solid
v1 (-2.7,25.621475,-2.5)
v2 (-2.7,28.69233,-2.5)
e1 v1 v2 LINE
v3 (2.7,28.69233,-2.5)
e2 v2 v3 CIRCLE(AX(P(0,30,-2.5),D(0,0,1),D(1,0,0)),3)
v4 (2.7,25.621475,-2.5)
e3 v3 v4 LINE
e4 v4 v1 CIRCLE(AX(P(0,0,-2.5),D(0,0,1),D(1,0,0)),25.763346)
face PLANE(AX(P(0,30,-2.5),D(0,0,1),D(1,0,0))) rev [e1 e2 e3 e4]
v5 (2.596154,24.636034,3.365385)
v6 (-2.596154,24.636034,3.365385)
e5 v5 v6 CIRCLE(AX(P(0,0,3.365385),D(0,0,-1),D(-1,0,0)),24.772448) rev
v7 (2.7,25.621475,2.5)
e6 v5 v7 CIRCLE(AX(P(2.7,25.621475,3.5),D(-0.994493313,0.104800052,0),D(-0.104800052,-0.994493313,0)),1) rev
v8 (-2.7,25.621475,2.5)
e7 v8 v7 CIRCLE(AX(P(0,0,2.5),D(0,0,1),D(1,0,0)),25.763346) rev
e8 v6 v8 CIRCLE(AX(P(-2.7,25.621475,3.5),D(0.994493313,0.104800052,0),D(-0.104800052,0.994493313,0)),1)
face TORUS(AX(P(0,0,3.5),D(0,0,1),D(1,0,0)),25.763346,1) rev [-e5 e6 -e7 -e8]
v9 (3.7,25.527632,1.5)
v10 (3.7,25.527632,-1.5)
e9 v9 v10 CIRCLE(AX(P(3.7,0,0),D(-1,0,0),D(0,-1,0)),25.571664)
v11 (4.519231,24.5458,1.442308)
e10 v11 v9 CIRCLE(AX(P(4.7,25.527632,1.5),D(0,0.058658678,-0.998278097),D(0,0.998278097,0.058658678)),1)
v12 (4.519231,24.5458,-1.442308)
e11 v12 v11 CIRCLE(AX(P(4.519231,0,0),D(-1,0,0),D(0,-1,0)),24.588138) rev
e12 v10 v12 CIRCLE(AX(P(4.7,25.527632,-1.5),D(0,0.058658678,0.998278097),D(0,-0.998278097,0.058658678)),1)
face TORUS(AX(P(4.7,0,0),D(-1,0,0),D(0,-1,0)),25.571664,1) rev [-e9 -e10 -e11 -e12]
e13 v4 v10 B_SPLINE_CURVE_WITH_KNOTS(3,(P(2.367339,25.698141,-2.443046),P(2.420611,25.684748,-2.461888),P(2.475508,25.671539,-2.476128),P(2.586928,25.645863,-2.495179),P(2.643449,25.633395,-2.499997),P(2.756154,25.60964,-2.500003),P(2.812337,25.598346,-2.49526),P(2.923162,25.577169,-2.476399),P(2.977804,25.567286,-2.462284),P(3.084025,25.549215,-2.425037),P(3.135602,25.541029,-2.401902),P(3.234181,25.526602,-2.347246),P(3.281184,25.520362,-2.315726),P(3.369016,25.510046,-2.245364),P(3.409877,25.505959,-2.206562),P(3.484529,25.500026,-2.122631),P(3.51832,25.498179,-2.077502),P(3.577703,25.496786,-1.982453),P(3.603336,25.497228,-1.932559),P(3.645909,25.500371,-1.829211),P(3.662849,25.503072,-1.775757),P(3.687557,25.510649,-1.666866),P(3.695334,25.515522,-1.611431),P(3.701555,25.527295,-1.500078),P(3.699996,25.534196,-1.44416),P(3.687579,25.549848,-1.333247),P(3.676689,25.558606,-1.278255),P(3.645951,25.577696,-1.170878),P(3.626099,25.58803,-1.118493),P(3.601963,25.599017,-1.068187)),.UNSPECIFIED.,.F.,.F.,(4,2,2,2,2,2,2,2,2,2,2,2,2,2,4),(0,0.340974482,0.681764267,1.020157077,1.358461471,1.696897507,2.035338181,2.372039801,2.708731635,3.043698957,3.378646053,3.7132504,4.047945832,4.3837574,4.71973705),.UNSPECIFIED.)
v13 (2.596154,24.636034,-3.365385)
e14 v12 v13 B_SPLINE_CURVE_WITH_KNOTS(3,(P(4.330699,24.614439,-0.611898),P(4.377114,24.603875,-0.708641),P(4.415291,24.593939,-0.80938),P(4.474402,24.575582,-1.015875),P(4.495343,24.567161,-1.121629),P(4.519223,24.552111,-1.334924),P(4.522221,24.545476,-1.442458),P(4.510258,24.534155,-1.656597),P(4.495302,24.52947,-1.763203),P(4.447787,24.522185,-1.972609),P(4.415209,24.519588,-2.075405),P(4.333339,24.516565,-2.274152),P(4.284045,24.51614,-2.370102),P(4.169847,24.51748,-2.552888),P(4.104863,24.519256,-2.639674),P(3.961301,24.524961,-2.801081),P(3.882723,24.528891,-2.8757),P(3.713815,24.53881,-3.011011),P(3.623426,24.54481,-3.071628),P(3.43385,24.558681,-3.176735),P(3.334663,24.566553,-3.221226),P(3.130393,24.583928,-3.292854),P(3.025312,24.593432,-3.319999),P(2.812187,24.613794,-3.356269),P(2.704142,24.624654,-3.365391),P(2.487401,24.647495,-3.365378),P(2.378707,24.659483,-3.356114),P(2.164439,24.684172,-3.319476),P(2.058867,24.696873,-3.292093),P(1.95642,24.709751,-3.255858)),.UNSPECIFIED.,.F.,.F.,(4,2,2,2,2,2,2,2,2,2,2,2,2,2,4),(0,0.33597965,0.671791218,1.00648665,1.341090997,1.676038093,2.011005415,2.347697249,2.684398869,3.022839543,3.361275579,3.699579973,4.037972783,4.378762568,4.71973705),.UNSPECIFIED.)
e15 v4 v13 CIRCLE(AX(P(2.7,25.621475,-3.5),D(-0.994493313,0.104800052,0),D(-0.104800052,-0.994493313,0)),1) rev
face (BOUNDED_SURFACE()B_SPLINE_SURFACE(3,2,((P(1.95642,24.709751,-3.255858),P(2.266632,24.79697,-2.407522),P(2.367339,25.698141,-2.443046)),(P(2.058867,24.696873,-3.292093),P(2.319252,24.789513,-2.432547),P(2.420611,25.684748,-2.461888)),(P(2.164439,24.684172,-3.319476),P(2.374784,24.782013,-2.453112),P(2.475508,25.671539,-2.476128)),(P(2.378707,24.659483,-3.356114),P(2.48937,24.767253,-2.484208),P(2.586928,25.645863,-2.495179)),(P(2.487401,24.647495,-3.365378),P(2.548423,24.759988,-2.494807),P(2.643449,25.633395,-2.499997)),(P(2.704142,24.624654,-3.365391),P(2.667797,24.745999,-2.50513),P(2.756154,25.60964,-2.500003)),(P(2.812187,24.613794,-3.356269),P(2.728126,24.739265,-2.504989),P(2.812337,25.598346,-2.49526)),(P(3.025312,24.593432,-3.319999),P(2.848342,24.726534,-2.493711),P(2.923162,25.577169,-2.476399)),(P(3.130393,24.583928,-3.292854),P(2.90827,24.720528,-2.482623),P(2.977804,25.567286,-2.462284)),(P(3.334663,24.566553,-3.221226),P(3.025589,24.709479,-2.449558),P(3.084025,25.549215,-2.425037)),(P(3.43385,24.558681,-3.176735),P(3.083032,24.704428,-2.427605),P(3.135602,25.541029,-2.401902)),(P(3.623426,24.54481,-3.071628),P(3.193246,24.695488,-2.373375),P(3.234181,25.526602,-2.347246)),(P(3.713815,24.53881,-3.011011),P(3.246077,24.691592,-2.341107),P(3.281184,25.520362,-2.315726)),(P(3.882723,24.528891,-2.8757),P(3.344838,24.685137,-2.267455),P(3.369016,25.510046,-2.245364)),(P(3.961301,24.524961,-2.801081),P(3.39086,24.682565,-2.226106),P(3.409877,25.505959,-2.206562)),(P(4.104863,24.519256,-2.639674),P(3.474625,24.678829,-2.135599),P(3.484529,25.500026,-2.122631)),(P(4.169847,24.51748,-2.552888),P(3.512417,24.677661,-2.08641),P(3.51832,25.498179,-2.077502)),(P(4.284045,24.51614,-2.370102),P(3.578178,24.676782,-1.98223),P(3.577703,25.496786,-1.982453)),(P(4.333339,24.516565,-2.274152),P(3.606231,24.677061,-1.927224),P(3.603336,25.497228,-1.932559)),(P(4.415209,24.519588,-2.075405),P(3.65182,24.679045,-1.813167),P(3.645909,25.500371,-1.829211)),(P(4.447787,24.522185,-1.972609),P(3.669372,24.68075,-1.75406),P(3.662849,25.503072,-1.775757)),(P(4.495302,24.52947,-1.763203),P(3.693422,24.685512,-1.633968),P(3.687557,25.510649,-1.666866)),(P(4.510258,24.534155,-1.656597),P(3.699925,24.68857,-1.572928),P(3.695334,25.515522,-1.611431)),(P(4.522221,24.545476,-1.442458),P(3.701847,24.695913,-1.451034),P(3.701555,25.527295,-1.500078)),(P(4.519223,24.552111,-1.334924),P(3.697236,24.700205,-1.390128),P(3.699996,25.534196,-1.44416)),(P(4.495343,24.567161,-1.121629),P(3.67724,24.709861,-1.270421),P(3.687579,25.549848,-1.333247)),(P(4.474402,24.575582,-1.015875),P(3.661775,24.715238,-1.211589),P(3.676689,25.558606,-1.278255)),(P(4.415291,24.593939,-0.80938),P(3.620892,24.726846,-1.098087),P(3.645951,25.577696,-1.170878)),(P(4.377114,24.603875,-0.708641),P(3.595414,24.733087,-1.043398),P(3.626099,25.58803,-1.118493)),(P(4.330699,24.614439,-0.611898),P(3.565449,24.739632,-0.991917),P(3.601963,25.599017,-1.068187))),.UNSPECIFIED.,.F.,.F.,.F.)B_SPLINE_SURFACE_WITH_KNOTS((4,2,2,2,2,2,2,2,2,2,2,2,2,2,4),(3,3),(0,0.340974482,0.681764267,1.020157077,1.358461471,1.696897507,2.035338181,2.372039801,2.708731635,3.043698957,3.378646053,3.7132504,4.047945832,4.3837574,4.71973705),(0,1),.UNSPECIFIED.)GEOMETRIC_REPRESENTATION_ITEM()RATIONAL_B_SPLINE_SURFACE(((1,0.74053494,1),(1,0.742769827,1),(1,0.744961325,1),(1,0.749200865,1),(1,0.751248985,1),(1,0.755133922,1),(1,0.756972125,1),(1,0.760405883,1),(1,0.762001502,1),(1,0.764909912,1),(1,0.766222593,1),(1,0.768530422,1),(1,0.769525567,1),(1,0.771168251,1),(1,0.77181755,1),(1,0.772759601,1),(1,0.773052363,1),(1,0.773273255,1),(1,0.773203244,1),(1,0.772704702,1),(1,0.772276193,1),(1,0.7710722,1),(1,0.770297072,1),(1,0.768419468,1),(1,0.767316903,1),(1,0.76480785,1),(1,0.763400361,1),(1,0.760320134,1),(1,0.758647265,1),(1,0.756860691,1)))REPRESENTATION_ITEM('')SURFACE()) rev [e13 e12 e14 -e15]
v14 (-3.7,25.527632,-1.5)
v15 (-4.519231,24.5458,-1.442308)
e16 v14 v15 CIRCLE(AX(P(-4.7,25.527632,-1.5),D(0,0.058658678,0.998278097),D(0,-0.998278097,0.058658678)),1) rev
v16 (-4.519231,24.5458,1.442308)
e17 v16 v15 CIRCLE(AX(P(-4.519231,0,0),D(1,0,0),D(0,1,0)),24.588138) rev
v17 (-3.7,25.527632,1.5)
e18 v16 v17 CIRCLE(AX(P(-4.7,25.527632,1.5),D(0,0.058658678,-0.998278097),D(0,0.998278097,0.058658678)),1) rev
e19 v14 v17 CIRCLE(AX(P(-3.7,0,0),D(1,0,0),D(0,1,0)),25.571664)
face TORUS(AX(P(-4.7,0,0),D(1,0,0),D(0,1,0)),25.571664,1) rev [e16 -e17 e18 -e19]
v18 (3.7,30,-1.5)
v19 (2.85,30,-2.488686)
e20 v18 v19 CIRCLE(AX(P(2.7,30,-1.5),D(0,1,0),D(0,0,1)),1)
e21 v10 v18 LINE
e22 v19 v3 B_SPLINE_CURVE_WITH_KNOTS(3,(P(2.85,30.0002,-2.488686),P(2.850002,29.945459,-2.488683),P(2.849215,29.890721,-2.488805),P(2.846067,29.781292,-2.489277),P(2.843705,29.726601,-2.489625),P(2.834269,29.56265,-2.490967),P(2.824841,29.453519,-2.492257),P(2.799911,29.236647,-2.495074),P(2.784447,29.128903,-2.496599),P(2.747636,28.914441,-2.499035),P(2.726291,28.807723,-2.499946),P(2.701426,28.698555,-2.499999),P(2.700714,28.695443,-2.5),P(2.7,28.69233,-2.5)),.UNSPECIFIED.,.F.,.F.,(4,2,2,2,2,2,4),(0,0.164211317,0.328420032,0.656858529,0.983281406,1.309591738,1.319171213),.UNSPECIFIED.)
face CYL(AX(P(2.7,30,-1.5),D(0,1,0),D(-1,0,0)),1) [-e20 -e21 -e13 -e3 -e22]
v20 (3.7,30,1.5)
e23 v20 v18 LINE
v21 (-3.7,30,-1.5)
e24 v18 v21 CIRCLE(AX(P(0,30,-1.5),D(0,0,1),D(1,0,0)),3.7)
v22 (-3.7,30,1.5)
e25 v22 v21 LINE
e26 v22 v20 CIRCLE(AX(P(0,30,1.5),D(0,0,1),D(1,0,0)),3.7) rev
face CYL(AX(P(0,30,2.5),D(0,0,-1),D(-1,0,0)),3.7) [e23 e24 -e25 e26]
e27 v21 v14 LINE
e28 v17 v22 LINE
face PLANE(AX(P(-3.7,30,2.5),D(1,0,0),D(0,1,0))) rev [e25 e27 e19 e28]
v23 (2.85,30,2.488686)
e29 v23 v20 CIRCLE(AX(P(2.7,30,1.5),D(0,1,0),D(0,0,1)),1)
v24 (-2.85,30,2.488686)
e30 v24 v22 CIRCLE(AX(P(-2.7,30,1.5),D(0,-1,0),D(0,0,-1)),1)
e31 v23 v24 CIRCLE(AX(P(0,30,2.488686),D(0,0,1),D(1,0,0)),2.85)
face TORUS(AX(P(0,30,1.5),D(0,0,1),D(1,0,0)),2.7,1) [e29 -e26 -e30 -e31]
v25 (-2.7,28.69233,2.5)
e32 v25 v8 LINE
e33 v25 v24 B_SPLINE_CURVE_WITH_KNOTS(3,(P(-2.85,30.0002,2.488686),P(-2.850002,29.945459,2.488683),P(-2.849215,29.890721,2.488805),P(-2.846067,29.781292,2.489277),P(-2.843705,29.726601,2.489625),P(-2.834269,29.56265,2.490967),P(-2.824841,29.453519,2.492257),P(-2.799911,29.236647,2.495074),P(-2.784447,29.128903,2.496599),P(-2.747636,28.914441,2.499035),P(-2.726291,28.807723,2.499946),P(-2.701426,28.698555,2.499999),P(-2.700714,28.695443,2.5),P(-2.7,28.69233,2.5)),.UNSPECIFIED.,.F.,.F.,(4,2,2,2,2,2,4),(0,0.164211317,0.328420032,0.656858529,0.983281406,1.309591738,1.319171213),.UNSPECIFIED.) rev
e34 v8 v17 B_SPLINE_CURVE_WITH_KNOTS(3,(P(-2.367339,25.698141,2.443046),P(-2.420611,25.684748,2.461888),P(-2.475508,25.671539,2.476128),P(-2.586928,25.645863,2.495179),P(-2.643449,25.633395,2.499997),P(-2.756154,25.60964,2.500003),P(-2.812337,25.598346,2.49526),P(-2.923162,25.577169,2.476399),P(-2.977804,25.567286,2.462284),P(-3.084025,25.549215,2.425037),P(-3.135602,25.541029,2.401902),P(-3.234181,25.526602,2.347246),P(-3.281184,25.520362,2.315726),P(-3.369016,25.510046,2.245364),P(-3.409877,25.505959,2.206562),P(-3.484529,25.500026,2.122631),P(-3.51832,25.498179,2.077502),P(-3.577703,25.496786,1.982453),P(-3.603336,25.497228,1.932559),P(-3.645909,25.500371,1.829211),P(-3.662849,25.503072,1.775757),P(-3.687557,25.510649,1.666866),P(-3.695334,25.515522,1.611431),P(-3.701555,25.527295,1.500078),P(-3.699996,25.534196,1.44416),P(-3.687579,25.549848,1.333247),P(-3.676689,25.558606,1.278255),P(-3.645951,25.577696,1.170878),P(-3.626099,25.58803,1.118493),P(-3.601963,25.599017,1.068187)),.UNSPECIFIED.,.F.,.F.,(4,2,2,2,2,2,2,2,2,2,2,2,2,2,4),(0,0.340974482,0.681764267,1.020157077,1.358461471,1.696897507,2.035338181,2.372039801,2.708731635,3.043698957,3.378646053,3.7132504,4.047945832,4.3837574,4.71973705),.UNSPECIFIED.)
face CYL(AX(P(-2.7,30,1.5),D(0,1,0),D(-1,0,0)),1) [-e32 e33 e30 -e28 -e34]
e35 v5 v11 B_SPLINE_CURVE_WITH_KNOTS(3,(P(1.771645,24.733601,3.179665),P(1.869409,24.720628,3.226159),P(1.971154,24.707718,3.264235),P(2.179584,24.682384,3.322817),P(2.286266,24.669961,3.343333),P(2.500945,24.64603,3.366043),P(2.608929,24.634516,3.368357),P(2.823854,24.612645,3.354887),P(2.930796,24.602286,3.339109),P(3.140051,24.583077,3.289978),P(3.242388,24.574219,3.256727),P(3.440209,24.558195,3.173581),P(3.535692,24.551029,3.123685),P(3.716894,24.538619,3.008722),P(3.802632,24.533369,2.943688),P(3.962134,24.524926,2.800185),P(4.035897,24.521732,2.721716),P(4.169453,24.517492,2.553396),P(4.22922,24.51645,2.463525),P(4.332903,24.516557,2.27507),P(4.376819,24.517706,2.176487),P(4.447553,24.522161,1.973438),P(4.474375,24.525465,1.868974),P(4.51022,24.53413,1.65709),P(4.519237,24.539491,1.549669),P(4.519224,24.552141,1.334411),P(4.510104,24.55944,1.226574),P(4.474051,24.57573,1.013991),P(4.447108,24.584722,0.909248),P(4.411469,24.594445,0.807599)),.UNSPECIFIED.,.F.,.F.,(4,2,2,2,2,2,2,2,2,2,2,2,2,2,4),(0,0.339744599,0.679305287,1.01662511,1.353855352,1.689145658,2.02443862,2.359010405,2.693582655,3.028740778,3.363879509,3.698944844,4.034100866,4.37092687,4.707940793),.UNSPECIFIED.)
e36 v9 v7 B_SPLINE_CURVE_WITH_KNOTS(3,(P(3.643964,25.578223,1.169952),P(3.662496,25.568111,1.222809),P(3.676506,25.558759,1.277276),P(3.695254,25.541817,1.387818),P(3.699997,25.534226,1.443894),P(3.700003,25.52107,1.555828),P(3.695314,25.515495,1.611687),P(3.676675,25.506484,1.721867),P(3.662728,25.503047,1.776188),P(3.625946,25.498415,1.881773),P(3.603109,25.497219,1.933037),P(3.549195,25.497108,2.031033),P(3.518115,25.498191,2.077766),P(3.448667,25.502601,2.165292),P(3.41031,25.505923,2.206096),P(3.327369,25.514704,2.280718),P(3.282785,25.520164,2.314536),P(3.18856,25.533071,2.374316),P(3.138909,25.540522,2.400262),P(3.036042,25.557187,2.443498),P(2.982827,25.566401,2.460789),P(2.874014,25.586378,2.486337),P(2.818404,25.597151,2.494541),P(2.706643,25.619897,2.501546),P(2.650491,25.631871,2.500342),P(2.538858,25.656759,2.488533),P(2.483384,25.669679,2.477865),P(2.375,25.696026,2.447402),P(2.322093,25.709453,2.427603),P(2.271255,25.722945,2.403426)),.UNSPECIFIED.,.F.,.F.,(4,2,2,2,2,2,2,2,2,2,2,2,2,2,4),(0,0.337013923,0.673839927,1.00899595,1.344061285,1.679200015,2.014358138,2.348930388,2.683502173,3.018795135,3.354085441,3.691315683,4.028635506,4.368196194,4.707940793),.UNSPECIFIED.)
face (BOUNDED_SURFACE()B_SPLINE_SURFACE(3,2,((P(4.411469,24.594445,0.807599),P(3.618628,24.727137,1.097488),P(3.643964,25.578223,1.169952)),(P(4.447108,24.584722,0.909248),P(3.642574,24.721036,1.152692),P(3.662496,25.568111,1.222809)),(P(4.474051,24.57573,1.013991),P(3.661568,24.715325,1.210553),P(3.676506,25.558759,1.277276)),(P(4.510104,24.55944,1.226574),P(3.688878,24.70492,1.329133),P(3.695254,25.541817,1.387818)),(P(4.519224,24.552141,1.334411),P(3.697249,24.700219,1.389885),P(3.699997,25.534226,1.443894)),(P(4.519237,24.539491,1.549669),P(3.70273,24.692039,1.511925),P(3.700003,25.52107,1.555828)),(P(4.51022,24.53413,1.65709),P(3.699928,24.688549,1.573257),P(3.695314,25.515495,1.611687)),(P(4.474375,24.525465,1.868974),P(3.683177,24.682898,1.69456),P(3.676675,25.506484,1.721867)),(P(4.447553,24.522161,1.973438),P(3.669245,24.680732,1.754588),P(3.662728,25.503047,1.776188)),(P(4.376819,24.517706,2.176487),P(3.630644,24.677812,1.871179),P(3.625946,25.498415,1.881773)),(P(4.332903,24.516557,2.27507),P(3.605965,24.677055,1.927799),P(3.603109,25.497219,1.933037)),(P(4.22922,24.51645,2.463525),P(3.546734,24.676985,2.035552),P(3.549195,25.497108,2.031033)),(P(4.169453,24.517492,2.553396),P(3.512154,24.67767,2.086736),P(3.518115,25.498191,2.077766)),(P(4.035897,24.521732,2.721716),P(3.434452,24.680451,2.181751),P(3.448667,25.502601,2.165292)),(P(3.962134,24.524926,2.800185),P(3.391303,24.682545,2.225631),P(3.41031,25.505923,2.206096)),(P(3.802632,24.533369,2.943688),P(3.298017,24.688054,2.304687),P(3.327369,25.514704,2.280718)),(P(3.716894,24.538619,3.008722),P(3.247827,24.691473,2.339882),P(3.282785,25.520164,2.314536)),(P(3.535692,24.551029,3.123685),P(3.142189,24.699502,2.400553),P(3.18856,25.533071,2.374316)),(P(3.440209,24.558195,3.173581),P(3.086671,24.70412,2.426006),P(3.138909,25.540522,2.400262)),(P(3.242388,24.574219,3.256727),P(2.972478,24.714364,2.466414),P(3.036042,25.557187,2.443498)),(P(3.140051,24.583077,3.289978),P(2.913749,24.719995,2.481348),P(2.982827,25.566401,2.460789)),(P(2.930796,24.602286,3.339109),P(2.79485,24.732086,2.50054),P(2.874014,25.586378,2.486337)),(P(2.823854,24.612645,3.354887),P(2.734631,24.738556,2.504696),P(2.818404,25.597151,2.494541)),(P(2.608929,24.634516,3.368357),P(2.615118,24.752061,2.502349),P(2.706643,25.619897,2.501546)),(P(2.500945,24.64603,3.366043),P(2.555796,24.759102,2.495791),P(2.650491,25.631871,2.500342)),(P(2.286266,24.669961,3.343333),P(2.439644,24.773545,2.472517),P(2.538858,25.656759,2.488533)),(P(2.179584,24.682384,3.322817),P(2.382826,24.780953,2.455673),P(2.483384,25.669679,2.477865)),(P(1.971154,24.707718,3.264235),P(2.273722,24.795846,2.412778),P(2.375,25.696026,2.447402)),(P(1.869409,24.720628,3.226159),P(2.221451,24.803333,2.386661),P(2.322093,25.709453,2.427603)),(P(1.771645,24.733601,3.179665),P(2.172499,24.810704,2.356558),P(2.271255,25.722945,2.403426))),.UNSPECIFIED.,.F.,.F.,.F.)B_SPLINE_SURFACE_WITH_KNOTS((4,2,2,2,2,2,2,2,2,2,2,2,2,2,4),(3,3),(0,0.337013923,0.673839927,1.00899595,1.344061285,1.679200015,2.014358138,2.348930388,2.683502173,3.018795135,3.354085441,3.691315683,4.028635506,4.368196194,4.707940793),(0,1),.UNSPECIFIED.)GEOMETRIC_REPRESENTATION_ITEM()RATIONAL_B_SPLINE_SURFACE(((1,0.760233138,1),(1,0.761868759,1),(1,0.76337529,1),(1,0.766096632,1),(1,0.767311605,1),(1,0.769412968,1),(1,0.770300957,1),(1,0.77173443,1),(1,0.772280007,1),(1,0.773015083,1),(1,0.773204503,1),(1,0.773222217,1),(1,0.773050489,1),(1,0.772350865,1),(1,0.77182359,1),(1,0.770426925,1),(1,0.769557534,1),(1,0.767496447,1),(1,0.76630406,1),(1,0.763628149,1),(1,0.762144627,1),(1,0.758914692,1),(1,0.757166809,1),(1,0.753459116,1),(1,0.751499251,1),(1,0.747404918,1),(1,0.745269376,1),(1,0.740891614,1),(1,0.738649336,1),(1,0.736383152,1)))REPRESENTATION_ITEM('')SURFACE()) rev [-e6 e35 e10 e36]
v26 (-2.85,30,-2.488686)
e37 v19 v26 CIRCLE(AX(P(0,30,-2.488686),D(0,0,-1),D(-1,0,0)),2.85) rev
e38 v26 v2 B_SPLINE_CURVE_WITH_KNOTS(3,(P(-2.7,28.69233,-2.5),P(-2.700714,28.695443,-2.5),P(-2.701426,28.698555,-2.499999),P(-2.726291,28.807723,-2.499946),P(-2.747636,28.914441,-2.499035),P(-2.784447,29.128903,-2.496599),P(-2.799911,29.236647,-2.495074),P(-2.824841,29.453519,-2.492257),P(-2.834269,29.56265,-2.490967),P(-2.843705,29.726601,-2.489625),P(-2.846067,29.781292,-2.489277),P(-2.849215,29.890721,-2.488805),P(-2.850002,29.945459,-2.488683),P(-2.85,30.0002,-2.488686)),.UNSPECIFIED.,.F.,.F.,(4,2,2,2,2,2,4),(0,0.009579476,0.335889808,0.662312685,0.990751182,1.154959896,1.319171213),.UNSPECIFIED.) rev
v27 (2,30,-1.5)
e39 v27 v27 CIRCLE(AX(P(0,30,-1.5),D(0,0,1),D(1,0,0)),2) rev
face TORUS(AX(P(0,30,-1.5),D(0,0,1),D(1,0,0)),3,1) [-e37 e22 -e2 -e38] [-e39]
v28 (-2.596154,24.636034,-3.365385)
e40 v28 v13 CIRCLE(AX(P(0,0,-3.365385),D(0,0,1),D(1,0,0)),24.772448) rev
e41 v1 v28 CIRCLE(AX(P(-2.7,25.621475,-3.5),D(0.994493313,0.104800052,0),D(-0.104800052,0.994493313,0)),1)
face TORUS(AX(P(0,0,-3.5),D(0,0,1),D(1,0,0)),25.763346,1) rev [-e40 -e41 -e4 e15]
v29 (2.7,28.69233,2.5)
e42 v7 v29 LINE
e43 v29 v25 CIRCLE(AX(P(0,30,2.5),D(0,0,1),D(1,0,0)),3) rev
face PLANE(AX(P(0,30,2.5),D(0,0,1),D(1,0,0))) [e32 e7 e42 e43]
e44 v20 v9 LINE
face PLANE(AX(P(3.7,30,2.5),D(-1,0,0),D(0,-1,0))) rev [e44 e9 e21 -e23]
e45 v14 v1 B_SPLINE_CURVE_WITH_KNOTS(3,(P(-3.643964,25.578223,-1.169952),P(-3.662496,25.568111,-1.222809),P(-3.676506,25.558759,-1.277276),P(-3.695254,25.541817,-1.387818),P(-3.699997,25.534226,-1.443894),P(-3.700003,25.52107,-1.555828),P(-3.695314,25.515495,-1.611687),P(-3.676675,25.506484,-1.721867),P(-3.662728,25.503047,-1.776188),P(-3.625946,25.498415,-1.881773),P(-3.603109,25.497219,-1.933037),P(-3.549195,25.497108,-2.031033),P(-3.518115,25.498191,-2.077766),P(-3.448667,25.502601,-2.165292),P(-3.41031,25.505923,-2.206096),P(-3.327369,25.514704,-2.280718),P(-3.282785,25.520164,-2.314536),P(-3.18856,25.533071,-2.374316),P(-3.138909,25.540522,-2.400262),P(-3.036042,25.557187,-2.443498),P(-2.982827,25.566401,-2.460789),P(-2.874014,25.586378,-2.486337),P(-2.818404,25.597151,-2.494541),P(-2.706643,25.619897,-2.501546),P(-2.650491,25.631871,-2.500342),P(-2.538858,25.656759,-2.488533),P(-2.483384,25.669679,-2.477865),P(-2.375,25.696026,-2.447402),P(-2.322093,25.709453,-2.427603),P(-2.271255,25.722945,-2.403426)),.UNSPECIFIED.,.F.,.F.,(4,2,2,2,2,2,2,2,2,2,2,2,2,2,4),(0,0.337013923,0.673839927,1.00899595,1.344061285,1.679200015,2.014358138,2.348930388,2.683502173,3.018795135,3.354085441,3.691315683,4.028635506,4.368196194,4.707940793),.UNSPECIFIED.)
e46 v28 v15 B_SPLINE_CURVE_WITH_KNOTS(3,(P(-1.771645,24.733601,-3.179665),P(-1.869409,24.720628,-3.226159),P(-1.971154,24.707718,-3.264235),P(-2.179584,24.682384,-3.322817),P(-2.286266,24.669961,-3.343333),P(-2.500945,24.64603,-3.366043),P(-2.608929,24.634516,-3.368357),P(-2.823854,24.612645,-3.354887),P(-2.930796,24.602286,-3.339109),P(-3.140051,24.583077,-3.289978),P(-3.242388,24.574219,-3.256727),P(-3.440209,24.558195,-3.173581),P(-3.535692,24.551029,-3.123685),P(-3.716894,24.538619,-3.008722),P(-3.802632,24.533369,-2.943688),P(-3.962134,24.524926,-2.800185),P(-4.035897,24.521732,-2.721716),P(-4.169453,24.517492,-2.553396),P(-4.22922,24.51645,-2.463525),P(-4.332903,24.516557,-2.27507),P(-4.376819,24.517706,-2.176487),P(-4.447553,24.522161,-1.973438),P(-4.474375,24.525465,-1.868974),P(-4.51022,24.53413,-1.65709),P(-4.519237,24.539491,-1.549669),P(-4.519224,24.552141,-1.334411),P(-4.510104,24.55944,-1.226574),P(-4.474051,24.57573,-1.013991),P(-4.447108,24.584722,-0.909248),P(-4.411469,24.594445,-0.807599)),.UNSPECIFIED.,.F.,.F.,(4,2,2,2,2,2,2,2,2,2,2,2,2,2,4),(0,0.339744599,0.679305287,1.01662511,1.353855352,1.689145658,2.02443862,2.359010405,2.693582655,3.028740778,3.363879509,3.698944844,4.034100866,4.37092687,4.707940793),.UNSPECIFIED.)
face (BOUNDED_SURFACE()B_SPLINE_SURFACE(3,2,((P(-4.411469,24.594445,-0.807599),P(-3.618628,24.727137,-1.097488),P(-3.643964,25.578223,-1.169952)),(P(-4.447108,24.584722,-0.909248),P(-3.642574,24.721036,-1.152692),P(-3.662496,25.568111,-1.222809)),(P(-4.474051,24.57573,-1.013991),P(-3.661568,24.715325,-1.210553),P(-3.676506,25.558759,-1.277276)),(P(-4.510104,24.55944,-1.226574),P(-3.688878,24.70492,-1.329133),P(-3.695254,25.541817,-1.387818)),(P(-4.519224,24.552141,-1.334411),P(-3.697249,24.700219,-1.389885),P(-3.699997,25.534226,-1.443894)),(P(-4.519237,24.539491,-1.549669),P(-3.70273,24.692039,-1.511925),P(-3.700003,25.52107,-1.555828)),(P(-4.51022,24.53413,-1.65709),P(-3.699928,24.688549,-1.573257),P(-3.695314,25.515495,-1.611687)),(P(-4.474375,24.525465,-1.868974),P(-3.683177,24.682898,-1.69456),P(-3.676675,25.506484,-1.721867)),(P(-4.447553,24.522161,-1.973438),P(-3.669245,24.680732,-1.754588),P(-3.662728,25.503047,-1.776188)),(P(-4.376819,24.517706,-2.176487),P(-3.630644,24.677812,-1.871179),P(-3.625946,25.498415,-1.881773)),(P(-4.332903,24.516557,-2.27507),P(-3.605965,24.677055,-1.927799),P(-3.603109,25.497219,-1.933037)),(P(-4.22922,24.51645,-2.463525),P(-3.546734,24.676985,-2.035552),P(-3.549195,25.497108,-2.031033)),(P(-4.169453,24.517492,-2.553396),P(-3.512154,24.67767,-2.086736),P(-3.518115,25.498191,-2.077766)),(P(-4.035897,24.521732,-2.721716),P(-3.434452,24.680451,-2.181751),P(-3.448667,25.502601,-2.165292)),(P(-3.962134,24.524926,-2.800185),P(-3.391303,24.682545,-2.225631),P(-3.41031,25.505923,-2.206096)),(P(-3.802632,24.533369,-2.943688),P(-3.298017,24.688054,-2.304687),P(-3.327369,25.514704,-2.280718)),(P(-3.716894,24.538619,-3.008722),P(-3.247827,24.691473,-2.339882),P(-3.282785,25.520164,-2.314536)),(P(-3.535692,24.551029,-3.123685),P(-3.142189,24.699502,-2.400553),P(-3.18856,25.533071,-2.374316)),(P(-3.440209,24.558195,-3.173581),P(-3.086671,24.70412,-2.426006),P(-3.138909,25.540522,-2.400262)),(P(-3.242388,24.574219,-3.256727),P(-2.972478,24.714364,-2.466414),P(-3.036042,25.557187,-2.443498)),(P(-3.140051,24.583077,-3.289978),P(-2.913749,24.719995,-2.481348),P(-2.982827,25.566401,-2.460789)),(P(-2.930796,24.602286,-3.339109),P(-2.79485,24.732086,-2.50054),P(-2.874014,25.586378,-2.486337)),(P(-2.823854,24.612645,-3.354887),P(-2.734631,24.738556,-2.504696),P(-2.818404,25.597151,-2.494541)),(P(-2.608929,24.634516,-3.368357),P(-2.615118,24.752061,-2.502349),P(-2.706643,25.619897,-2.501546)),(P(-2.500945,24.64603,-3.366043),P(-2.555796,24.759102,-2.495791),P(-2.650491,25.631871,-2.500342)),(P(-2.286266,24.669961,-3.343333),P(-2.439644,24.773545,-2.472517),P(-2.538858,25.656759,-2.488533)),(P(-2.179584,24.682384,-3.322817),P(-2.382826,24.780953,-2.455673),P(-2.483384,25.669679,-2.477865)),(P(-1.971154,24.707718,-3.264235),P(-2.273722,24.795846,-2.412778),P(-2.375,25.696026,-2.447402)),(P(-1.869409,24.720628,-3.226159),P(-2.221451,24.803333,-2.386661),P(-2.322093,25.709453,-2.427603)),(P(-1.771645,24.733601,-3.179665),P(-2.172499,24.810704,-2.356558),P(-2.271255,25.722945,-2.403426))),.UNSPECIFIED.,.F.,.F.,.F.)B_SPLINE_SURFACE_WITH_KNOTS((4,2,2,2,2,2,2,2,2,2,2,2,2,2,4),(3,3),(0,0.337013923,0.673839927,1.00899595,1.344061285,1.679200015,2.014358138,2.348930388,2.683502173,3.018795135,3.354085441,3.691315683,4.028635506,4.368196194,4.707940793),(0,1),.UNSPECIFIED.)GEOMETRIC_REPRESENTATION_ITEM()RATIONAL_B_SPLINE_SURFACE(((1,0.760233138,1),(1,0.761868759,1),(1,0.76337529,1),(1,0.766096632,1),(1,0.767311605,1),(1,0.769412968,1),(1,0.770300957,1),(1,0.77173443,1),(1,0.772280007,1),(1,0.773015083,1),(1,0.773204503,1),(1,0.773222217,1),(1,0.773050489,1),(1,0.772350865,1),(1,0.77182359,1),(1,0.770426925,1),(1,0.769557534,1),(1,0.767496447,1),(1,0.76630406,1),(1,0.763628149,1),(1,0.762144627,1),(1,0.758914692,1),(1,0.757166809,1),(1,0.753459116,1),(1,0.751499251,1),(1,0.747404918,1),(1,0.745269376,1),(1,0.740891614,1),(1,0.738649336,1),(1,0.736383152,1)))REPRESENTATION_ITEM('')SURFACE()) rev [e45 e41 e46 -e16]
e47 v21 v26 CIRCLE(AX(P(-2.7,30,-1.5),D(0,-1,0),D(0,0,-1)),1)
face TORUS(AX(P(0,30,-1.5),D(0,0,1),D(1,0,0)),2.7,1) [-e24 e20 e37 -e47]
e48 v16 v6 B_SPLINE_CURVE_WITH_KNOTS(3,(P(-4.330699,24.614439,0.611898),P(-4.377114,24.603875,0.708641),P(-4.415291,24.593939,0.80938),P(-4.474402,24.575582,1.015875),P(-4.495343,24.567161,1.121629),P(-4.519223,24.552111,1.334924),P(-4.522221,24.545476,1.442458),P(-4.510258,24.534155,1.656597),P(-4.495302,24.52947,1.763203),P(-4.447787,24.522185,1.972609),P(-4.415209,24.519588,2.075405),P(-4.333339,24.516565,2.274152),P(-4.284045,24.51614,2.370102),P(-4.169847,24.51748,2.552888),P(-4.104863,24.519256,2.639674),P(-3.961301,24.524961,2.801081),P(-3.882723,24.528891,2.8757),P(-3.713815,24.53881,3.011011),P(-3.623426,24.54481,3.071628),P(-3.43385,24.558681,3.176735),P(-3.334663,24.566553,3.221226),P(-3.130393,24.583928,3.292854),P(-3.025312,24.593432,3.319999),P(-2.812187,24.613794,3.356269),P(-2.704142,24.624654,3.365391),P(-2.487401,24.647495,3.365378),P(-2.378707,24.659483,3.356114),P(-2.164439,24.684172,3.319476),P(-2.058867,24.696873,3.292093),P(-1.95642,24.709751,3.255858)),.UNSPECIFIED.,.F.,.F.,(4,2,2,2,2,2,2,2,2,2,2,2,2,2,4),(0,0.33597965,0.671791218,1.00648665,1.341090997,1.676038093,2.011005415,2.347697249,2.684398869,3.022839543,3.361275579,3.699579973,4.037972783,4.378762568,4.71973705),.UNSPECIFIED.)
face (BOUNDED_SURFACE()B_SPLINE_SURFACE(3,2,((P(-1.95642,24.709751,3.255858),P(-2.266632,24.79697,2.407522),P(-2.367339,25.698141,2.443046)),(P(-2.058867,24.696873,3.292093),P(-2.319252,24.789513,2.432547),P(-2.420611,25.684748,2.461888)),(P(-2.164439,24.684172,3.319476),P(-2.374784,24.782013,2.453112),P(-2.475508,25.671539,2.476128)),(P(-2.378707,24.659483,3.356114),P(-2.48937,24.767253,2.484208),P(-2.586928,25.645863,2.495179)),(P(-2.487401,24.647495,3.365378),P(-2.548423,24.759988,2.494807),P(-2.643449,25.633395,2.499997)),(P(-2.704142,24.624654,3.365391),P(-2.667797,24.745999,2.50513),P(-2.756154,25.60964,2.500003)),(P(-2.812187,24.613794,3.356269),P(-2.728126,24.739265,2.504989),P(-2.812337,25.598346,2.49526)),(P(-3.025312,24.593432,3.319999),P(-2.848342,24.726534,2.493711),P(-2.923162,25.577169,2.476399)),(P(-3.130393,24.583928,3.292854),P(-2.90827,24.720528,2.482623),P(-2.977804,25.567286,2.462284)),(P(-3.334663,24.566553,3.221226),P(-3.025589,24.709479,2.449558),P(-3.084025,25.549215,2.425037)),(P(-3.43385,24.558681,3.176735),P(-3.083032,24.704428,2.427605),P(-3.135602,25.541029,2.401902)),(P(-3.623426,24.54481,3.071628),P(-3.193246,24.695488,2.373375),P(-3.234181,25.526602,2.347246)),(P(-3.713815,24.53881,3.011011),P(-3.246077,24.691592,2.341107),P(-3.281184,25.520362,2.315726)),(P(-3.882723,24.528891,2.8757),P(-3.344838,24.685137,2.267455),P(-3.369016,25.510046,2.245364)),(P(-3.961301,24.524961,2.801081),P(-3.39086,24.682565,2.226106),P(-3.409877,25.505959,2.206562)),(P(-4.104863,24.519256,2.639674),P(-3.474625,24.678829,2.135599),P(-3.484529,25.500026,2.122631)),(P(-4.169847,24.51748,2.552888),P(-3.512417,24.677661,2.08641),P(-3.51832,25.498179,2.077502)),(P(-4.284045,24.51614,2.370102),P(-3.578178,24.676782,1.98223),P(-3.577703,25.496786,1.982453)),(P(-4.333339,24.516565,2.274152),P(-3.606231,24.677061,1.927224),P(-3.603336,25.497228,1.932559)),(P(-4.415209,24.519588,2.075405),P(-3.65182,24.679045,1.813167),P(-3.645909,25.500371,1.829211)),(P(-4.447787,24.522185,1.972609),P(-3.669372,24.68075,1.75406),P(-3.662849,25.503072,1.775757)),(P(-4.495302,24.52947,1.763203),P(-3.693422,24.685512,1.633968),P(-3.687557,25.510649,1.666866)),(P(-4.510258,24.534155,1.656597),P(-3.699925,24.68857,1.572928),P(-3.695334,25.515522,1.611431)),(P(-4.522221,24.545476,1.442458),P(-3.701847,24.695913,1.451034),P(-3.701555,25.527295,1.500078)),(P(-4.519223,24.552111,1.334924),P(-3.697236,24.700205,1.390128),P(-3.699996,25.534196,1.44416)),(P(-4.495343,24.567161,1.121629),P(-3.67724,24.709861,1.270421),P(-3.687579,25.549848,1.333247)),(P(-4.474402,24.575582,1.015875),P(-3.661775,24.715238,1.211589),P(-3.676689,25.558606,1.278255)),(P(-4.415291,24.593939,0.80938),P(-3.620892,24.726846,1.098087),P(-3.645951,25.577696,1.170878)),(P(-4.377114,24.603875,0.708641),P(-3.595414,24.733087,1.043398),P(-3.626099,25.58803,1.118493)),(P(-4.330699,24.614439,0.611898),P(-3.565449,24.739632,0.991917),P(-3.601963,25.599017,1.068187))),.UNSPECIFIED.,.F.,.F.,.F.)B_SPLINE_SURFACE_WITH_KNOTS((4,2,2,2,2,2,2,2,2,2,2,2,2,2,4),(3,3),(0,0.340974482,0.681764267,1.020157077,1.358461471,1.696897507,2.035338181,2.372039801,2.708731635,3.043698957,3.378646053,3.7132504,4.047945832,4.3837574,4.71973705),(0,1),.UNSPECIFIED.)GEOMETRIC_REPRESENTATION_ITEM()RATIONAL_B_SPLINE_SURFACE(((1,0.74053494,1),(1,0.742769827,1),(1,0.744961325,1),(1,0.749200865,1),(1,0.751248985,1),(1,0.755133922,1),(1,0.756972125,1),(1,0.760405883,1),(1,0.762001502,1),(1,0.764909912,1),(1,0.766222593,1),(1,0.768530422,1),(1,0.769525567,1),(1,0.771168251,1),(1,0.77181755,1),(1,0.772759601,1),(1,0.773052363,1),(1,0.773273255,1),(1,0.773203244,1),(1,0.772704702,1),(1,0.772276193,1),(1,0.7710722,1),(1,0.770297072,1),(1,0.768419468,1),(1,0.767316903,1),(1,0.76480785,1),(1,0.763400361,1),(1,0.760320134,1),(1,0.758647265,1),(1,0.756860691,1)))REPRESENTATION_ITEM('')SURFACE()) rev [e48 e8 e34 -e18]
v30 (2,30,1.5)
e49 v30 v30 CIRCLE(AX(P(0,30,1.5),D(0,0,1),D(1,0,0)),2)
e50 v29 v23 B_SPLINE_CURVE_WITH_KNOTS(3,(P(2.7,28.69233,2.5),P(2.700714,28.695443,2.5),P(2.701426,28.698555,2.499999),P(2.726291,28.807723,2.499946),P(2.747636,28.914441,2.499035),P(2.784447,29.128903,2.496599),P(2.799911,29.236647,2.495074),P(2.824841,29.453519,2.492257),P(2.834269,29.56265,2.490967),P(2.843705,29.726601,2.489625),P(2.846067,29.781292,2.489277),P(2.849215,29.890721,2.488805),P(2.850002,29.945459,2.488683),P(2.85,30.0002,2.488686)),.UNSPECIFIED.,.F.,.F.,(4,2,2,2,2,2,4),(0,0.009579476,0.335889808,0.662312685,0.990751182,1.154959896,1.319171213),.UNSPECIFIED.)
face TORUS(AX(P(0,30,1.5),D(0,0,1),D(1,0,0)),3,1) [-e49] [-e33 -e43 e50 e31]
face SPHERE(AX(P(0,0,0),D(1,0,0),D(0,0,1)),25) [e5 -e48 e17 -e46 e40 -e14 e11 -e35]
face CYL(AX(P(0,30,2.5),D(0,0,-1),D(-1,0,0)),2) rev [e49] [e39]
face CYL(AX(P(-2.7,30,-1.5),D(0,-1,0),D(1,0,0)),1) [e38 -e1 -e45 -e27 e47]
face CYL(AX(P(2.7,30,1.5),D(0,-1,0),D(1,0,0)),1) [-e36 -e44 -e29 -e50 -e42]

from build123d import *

# Parameters (mm, degrees)
SKETCH2_R           = 2
BOSS_EXTRUDE1_DEPTH = 2.5
FILLET1_R           = 1


with BuildPart() as part:
    # Sketch1 → Revolve1 (revolve)
    with BuildSketch(Plane(origin=(0, 0, 0), x_dir=(1, 0, 0), z_dir=(0, 1, 0))):
        with BuildLine():
            Line((25, 0), (-25, 0))
            ThreePointArc((-25, 0), (0, -25), (25, 0))
        make_face()
    revolve(axis=Axis((25, 0, 0), (-1, 0, 0)))

    # Sketch2 → Boss-Extrude1 (add, symmetric)
    with BuildSketch(Plane.XY):
        with BuildLine():
            Line((-3.7, 30), (-3.7, 20))
            Line((-3.7, 20), (3.7, 20))
            Line((3.7, 20), (3.7, 30))
            ThreePointArc((3.7, 30), (0, 33.7), (-3.7, 30))
        make_face()
        with Locations((0, 30)):
            Circle(SKETCH2_R, mode=Mode.SUBTRACT)
    extrude(amount=BOSS_EXTRUDE1_DEPTH, both=True)

    # Fillet1
    fillet1_edges = [part.edges().sort_by_distance(p)[0] for p in [
        (0, 33.7, -2.5),
        (3.7, 27.298983698, -2.5),
        (-3.7, 27.298983698, -2.5),
    ]]
    fillet(fillet1_edges, radius=FILLET1_R)
    fillet1_2_edges = [part.edges().sort_by_distance(p)[0] for p in [
        (3.7, 27.298983698, 2.5),
        (0, 33.7, 2.5),
        (-3.7, 27.298983698, 2.5),
    ]]
    fillet(fillet1_2_edges, radius=FILLET1_R)
    fillet1_3_edges = [part.edges().sort_by_distance(p)[0] for p in [
        (0, 24.874685928, -2.5),
    ]]
    fillet(fillet1_3_edges, radius=FILLET1_R)
    # the kernel refuses this fillet: 1 mm, written as the material it takes off along each edge
    with BuildSketch(Plane(origin=(0, 30, -2.5), x_dir=(1, 0, 0), z_dir=(0, -1, 0))) as fillet1_4_piece_1:
        with BuildLine():
            CenterArc((2 + FILLET1_R, FILLET1_R), FILLET1_R, 180, 90)
            Line((2, FILLET1_R), (2 - FILLET1_R * 0.02, FILLET1_R))
            Line((2 - FILLET1_R * 0.02, FILLET1_R), (2 - FILLET1_R * 0.02, -FILLET1_R * 0.02))
            Line((2 - FILLET1_R * 0.02, -FILLET1_R * 0.02), (2 + FILLET1_R, -FILLET1_R * 0.02))
            Line((2 + FILLET1_R, -FILLET1_R * 0.02), (2 + FILLET1_R, 0))
        make_face()
    revolve(axis=Axis((0, 30, -2.5), (0, 0, 1)), mode=Mode.SUBTRACT)
    # the kernel refuses this fillet: 1 mm, written as the material it takes off along each edge
    with BuildSketch(Plane(origin=(0, 30, 2.5), x_dir=(1, 0, 0), z_dir=(0, -1, 0))) as fillet1_5_piece_1:
        with BuildLine():
            CenterArc((2 + FILLET1_R, -FILLET1_R), FILLET1_R, 90, 90)
            Line((2, -FILLET1_R), (2 - FILLET1_R * 0.02, -FILLET1_R))
            Line((2 - FILLET1_R * 0.02, -FILLET1_R), (2 - FILLET1_R * 0.02, FILLET1_R * 0.02))
            Line((2 - FILLET1_R * 0.02, FILLET1_R * 0.02), (2 + FILLET1_R, FILLET1_R * 0.02))
            Line((2 + FILLET1_R, FILLET1_R * 0.02), (2 + FILLET1_R, 0))
        make_face()
    revolve(axis=Axis((0, 30, 2.5), (0, 0, 1)), mode=Mode.SUBTRACT)


solid = part.part
